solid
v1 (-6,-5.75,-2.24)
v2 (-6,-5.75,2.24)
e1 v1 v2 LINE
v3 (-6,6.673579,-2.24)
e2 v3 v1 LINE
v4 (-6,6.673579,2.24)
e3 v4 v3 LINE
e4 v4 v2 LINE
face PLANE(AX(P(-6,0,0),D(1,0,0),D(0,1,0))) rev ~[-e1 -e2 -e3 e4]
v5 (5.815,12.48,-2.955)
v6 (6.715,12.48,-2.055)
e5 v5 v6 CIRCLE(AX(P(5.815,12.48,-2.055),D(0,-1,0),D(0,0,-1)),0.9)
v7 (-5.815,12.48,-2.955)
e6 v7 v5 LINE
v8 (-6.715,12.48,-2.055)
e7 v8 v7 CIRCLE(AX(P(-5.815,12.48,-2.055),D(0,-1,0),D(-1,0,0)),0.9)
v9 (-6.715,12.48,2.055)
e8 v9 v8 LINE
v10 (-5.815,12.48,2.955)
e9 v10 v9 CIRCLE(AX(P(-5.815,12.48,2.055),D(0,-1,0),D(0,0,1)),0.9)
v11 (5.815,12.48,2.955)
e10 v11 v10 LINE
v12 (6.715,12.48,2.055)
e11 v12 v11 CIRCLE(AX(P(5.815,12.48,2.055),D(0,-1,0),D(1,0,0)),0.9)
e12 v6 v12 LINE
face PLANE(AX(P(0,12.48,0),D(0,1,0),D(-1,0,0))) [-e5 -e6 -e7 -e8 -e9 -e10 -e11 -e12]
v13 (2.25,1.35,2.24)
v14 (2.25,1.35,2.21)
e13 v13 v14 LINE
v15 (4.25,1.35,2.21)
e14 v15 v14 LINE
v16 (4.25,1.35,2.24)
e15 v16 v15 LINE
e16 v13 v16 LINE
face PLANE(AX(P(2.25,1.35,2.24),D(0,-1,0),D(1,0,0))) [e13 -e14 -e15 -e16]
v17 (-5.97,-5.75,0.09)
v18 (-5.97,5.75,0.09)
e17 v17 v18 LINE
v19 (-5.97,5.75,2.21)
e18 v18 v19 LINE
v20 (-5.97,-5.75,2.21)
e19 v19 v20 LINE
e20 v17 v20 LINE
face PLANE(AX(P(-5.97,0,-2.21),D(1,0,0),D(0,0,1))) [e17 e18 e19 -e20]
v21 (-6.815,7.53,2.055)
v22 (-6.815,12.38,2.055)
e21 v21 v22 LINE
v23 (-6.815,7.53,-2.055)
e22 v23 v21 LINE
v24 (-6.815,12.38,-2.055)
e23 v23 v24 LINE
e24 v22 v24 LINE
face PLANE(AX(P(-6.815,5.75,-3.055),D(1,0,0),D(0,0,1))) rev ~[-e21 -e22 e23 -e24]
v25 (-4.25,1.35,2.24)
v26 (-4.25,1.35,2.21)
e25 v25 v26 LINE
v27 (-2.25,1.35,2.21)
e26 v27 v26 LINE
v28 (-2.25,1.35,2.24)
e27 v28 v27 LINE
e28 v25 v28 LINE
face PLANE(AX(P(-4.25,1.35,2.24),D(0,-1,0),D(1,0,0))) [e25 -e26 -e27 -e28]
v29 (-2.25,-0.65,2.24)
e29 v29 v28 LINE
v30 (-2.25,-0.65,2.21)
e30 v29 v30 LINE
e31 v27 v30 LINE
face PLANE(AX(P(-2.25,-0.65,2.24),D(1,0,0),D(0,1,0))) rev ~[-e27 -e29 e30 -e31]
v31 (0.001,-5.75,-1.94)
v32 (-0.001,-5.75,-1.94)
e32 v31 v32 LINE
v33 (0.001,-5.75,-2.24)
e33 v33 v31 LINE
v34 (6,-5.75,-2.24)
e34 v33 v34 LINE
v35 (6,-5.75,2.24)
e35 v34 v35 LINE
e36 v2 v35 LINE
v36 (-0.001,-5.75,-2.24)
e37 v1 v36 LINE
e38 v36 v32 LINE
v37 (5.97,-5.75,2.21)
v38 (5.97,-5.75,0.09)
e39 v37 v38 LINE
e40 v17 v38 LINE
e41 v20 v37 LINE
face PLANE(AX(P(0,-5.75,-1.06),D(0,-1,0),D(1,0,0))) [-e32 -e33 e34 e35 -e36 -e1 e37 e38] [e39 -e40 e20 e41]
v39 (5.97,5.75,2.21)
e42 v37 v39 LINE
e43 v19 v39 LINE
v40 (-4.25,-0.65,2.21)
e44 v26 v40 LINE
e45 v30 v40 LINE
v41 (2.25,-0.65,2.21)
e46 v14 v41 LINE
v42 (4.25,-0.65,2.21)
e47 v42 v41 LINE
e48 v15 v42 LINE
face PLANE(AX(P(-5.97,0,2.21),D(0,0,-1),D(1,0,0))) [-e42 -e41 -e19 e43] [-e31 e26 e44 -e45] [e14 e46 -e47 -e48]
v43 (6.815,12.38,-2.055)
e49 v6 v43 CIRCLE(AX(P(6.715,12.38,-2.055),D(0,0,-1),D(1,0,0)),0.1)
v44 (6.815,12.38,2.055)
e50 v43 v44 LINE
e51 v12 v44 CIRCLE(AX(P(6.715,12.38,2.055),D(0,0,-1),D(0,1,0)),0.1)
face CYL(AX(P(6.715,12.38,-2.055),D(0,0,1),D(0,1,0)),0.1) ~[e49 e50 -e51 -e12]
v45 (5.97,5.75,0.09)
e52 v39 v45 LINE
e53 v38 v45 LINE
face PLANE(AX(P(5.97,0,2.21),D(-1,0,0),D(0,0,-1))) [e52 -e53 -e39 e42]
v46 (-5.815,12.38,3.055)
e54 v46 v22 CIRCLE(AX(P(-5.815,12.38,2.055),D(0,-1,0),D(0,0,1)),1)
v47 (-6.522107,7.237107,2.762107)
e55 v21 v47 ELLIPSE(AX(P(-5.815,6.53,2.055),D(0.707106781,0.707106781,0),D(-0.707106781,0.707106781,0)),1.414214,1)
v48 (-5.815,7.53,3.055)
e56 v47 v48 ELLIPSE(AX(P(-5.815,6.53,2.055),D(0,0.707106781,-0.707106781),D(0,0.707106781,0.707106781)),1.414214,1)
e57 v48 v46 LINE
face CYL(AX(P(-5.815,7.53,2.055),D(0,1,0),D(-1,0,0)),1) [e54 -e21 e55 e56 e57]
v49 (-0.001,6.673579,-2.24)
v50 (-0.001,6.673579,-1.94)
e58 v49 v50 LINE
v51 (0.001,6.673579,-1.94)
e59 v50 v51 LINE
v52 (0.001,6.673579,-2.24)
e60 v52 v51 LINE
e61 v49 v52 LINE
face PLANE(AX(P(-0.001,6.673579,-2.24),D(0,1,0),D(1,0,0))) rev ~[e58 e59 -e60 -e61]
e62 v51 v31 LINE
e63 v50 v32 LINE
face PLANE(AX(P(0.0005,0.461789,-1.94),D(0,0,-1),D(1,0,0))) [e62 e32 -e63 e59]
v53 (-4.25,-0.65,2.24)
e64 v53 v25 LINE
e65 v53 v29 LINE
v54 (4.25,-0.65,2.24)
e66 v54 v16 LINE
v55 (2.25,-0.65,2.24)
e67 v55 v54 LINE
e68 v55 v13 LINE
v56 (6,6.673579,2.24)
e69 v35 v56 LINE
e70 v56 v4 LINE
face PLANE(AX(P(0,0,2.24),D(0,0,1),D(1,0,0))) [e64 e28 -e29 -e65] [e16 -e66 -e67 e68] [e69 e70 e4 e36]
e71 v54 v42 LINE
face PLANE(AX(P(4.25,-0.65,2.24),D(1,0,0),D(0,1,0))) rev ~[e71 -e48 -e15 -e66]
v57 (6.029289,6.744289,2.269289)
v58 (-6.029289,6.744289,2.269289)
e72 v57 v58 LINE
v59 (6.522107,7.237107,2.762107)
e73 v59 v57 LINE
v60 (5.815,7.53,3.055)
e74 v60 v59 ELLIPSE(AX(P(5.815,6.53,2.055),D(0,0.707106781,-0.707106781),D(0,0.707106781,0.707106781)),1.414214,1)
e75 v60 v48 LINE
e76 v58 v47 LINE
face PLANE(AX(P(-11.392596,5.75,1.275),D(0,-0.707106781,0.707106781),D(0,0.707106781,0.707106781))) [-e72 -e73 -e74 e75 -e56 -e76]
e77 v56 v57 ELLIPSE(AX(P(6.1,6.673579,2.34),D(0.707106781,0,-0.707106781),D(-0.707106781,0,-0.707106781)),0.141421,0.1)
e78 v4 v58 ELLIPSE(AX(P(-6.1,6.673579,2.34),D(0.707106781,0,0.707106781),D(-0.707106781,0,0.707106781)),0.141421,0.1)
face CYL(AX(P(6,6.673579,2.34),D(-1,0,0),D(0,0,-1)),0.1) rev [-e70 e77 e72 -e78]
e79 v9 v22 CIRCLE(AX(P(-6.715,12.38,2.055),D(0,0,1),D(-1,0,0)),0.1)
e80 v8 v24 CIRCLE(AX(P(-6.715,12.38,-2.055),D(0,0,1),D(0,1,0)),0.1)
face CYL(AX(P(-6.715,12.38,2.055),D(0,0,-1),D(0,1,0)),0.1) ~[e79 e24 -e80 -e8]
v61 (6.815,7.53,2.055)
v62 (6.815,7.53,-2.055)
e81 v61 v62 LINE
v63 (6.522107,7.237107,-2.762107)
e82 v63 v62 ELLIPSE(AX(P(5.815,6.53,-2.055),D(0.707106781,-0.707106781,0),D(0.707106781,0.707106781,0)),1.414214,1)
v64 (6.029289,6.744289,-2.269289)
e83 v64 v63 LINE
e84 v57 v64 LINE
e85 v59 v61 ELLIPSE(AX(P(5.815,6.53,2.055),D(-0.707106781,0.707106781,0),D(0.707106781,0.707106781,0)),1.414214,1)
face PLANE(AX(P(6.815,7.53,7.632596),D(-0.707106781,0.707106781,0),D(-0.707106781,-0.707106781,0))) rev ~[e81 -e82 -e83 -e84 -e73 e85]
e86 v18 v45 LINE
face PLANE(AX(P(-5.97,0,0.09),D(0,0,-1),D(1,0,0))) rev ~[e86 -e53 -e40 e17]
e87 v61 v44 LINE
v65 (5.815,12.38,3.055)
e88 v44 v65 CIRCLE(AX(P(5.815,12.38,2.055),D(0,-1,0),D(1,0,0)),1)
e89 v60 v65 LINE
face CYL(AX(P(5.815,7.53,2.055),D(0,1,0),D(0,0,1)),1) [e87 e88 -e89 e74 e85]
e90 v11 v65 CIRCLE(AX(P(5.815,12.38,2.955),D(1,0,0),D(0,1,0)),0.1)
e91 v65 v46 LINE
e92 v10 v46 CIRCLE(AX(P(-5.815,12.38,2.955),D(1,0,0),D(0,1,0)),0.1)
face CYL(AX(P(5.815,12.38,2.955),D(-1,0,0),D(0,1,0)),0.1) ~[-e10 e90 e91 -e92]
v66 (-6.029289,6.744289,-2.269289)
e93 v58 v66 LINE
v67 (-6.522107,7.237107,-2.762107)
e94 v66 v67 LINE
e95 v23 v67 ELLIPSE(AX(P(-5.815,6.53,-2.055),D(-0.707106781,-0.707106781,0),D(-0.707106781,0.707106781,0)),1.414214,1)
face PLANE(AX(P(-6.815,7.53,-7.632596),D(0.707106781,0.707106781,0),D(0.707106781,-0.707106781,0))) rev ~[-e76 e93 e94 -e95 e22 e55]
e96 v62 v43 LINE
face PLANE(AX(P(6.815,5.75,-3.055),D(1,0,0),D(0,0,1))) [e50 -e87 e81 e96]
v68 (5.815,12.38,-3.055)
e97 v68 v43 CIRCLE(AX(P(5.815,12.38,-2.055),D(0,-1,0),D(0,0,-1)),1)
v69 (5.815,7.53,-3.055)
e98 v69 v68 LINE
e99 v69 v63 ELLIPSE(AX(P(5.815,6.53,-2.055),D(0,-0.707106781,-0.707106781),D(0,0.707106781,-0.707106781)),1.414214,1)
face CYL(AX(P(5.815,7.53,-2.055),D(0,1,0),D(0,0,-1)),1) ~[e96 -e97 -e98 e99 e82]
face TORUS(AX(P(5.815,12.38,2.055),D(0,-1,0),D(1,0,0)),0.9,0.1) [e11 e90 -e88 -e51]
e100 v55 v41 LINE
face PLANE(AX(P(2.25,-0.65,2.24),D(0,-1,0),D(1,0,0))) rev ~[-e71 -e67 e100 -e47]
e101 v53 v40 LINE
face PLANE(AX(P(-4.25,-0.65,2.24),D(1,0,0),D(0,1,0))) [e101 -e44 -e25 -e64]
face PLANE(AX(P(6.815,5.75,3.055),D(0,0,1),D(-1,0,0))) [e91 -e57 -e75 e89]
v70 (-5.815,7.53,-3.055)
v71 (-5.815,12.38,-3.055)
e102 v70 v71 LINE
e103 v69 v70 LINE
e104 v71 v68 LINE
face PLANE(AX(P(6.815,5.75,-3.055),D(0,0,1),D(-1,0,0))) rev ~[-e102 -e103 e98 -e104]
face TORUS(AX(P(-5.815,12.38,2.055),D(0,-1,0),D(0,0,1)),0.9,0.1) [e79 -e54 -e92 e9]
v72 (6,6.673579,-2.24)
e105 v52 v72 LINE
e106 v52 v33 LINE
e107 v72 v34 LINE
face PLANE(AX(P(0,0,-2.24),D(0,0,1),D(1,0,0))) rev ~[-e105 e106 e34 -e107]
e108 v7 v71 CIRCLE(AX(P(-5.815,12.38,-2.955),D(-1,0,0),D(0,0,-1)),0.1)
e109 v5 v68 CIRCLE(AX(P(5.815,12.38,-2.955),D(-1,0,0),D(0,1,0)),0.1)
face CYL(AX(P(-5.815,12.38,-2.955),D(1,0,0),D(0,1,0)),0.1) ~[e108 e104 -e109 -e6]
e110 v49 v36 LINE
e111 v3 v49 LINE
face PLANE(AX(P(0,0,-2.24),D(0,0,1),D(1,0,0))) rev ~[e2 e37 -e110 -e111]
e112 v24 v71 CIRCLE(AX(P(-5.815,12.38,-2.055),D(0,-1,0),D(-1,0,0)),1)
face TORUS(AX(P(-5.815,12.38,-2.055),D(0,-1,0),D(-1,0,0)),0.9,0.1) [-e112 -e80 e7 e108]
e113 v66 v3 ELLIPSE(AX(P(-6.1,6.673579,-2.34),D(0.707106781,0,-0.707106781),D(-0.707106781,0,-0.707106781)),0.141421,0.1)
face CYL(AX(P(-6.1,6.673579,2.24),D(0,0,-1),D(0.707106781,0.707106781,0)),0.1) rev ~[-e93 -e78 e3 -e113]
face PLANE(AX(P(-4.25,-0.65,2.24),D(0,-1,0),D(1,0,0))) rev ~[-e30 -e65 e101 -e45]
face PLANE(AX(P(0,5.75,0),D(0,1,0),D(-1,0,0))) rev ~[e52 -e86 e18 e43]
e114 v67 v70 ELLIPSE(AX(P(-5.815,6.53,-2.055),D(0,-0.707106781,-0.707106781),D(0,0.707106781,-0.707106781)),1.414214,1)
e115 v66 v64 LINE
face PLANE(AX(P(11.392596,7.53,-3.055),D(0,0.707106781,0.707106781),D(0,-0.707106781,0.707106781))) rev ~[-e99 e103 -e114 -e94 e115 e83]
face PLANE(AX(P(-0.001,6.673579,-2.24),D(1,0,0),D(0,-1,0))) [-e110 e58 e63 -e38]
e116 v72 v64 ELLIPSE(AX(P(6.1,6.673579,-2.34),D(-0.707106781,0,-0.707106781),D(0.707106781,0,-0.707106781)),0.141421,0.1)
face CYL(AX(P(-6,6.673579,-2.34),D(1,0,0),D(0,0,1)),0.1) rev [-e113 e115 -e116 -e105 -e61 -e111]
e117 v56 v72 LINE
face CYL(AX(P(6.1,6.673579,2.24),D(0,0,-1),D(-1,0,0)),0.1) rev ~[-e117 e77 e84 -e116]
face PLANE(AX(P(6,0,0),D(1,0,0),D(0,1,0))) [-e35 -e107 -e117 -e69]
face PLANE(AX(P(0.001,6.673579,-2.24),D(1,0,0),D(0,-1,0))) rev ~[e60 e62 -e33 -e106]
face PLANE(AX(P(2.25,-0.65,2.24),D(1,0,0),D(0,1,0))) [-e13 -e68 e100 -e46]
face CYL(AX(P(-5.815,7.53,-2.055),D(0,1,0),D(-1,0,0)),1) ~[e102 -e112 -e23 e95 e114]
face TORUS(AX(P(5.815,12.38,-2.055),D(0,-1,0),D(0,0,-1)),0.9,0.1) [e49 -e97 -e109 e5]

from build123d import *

# Parameters (mm, degrees)
F0_W         = 12
F0_H         = 4.48
F1_DEPTH     = 5.75
F0_W_2       = 11.94
F0_H_2       = 2.3
F2_DEPTH     = 5.75
F3_W         = 13.63
F3_H         = 6.11
F3_W_2       = 12
F3_H_2       = 4.48
F3_W_3       = 11.94
F3_H_3       = 2.12
F4_DEPTH     = 6.73
F5_T4_DEPTH  = 22.7851914372
F5_T9_DEPTH  = 22.7851914372
F5_T14_DEPTH = 22.7851914372
F5_T19_DEPTH = 15.2651914372
F5_T24_DEPTH = 15.2651914372
F5_T29_DEPTH = 15.2651914372
F5_T34_DEPTH = 22.7851914372
F5_T39_DEPTH = 22.7851914372
F5_T44_DEPTH = 22.7851914372
F5_T49_DEPTH = 15.2651914372
F5_T54_DEPTH = 15.2651914372
F5_T59_DEPTH = 15.2651914372
F6_R         = 0.1
F7_R         = 1
F8_R         = 0.1
F9_W         = 2
F9_H         = 2
F10_DEPTH    = 2.15
F11_W        = 0.001
F11_H        = 12.4235786438
F12_DEPTH    = 0.3


# Not quite as in the source:
# - a fillet or chamfer that OpenCascade refuses, or shapes differently, is made with other operations: its cross-section is extruded or revolved along the edge and cut away or added


with BuildPart() as f1:
    # F0 (on Front) → F1 (new body, symmetric)
    with BuildSketch(Plane.XZ):
        Rectangle(F0_W, F0_H)
        Polygon((5.97, -2.21), (-5.97, -2.21), (-5.97, 0.09), (-5.97, 2.21), (5.97, 2.21), (5.97, 0.09), align=None, mode=Mode.SUBTRACT)
    extrude(amount=F1_DEPTH, both=True)

    # F0 (on Front) → F2 (join, symmetric)
    with BuildSketch(Plane.XZ):
        with Locations((0, -1.06)):
            Rectangle(F0_W_2, F0_H_2)
    extrude(amount=F2_DEPTH, both=True)

    # F3 (on face) → F4 (join)
    with BuildSketch(Plane(origin=(0, 5.75, 0), x_dir=(-1, 0, 0), z_dir=(0, 1, 0))):
        Rectangle(F3_W, F3_H)
        Rectangle(F3_W_2, F3_H_2, mode=Mode.SUBTRACT)
        Rectangle(F3_W_2, F3_H_2)
        with Locations((0, 1.15)):
            Rectangle(F3_W_3, F3_H_3, mode=Mode.SUBTRACT)
        with Locations((0, 1.15)):
            Rectangle(F3_W_3, F3_H_3)
    extrude(amount=F4_DEPTH)

    # F5: chamfer of 1.78 on 4 edges, made by hand


with BuildPart() as f5_tool2:
    # F5_s3 → F5_t4 (new body)
    with BuildSketch(Plane.YZ.offset(-11.3925957186)):
        Polygon((5.75, 1.275), (7.53, 3.055), (5.75, 3.055), align=None)
    extrude(amount=F5_T4_DEPTH)

    split(bisect_by=Plane.YZ.offset(-6), keep=Keep.BOTTOM)


with BuildPart() as f1_1:
    add(f1.part)

    # F5_t1: cut F5_tool2
    add(f5_tool2.part, mode=Mode.SUBTRACT)


with BuildPart() as f5_tool7:
    # F5_s8 → F5_t9 (new body)
    with BuildSketch(Plane.YZ.offset(-11.3925957186)):
        Polygon((5.75, 1.275), (7.53, 3.055), (5.75, 3.055), align=None)
    extrude(amount=F5_T9_DEPTH)

    split(bisect_by=Plane.XY.offset(2.24), keep=Keep.TOP)


with BuildPart() as f1_2:
    add(f1_1.part)

    # F5_t6: cut F5_tool7
    add(f5_tool7.part, mode=Mode.SUBTRACT)


with BuildPart() as f5_tool12:
    # F5_s13 → F5_t14 (new body)
    with BuildSketch(Plane.YZ.offset(-11.3925957186)):
        Polygon((5.75, 1.275), (7.53, 3.055), (5.75, 3.055), align=None)
    extrude(amount=F5_T14_DEPTH)

    split(bisect_by=Plane.YZ.offset(6), keep=Keep.TOP)


with BuildPart() as f1_3:
    add(f1_2.part)

    # F5_t11: cut F5_tool12
    add(f5_tool12.part, mode=Mode.SUBTRACT)


with BuildPart() as f5_tool17:
    # F5_s18 → F5_t19 (new body)
    with BuildSketch(Plane.XY.offset(7.6325957186)):
        Polygon((6.815, 7.53), (5.035, 5.75), (6.815, 5.75), align=None)
    extrude(amount=-F5_T19_DEPTH)

    split(bisect_by=Plane.YZ.offset(6), keep=Keep.TOP)


with BuildPart() as f1_4:
    add(f1_3.part)

    # F5_t16: cut F5_tool17
    add(f5_tool17.part, mode=Mode.SUBTRACT)


with BuildPart() as f5_tool22:
    # F5_s23 → F5_t24 (new body)
    with BuildSketch(Plane.XY.offset(7.6325957186)):
        Polygon((6.815, 7.53), (5.035, 5.75), (6.815, 5.75), align=None)
    extrude(amount=-F5_T24_DEPTH)

    split(bisect_by=Plane.XY.offset(2.24), keep=Keep.TOP)


with BuildPart() as f1_5:
    add(f1_4.part)

    # F5_t21: cut F5_tool22
    add(f5_tool22.part, mode=Mode.SUBTRACT)


with BuildPart() as f5_tool27:
    # F5_s28 → F5_t29 (new body)
    with BuildSketch(Plane.XY.offset(7.6325957186)):
        Polygon((6.815, 7.53), (5.035, 5.75), (6.815, 5.75), align=None)
    extrude(amount=-F5_T29_DEPTH)

    split(bisect_by=Plane.XY.offset(-2.24), keep=Keep.BOTTOM)


with BuildPart() as f1_6:
    add(f1_5.part)

    # F5_t26: cut F5_tool27
    add(f5_tool27.part, mode=Mode.SUBTRACT)


with BuildPart() as f5_tool32:
    # F5_s33 → F5_t34 (new body)
    with BuildSketch(Plane.YZ.offset(11.3925957186)):
        Polygon((7.53, -3.055), (5.75, -1.275), (5.75, -3.055), align=None)
    extrude(amount=-F5_T34_DEPTH)

    split(bisect_by=Plane.XY.offset(-2.24), keep=Keep.BOTTOM)


with BuildPart() as f1_7:
    add(f1_6.part)

    # F5_t31: cut F5_tool32
    add(f5_tool32.part, mode=Mode.SUBTRACT)


with BuildPart() as f5_tool37:
    # F5_s38 → F5_t39 (new body)
    with BuildSketch(Plane.YZ.offset(11.3925957186)):
        Polygon((7.53, -3.055), (5.75, -1.275), (5.75, -3.055), align=None)
    extrude(amount=-F5_T39_DEPTH)

    split(bisect_by=Plane.YZ.offset(6), keep=Keep.TOP)


with BuildPart() as f1_8:
    add(f1_7.part)

    # F5_t36: cut F5_tool37
    add(f5_tool37.part, mode=Mode.SUBTRACT)


with BuildPart() as f5_tool42:
    # F5_s43 → F5_t44 (new body)
    with BuildSketch(Plane.YZ.offset(11.3925957186)):
        Polygon((7.53, -3.055), (5.75, -1.275), (5.75, -3.055), align=None)
    extrude(amount=-F5_T44_DEPTH)

    split(bisect_by=Plane.YZ.offset(-6), keep=Keep.BOTTOM)


with BuildPart() as f1_9:
    add(f1_8.part)

    # F5_t41: cut F5_tool42
    add(f5_tool42.part, mode=Mode.SUBTRACT)


with BuildPart() as f5_tool47:
    # F5_s48 → F5_t49 (new body)
    with BuildSketch(Plane.XY.offset(-7.6325957186)):
        Polygon((-6.815, 7.53), (-5.035, 5.75), (-6.815, 5.75), align=None)
    extrude(amount=F5_T49_DEPTH)

    split(bisect_by=Plane.YZ.offset(-6), keep=Keep.BOTTOM)


with BuildPart() as f1_10:
    add(f1_9.part)

    # F5_t46: cut F5_tool47
    add(f5_tool47.part, mode=Mode.SUBTRACT)


with BuildPart() as f5_tool52:
    # F5_s53 → F5_t54 (new body)
    with BuildSketch(Plane.XY.offset(-7.6325957186)):
        Polygon((-6.815, 7.53), (-5.035, 5.75), (-6.815, 5.75), align=None)
    extrude(amount=F5_T54_DEPTH)

    split(bisect_by=Plane.XY.offset(-2.24), keep=Keep.BOTTOM)


with BuildPart() as f1_11:
    add(f1_10.part)

    # F5_t51: cut F5_tool52
    add(f5_tool52.part, mode=Mode.SUBTRACT)


with BuildPart() as f5_tool57:
    # F5_s58 → F5_t59 (new body)
    with BuildSketch(Plane.XY.offset(-7.6325957186)):
        Polygon((-6.815, 7.53), (-5.035, 5.75), (-6.815, 5.75), align=None)
    extrude(amount=F5_T59_DEPTH)

    split(bisect_by=Plane.XY.offset(2.24), keep=Keep.TOP)


with BuildPart() as f1_12:
    add(f1_11.part)

    # F5_t56: cut F5_tool57
    add(f5_tool57.part, mode=Mode.SUBTRACT)

    # F6
    f6_edges = [f1_12.edges().sort_by_distance(p)[0] for p in [
        (0, 6.715, 2.24),
        (6, 6.715, 0),
        (-6, 6.715, 0),
        (0, 6.715, -2.24),
    ]]
    fillet(f6_edges, radius=F6_R)

    # F7
    f7_edges = [f1_12.edges().sort_by_distance(p)[0] for p in [
        (-6.815, 10.005, -3.055),
        (-6.815, 10.005, 3.055),
        (6.815, 10.005, -3.055),
        (6.815, 10.005, 3.055),
    ]]
    fillet(f7_edges, radius=F7_R)

    # F8
    f8_edges = [f1_12.edges().sort_by_distance(p)[0] for p in [
        (0, 12.48, 3.055),
        (-6.522107, 12.48, 2.762107),
        (6.522107, 12.48, 2.762107),
        (-6.522107, 12.48, -2.762107),
        (-6.815, 12.48, 0),
        (0, 12.48, -3.055),
        (6.522107, 12.48, -2.762107),
        (6.815, 12.48, 0),
    ]]
    fillet(f8_edges, radius=F8_R)

    # F9 (on face) → F10 (cut, through all)
    with BuildSketch(Plane.XY.offset(2.24)):
        with Locations((-3.25, 0.35)):
            Rectangle(F9_W, F9_H)
        with Locations((3.25, 0.35)):
            Rectangle(F9_W, F9_H)
    extrude(amount=-F10_DEPTH, mode=Mode.SUBTRACT)

    # F11 (on face) → F12 (cut)
    with BuildSketch(Plane(origin=(0, 0, -2.24), x_dir=(1, 0, 0), z_dir=(0, 0, -1))):
        with Locations((0.0005, -0.4617893219)):
            Rectangle(F11_W, F11_H)
        with Locations((-0.0005, -0.4617893219)):
            Rectangle(F11_W, F11_H)
    extrude(amount=-F12_DEPTH, mode=Mode.SUBTRACT)


solid = f1_12.part
